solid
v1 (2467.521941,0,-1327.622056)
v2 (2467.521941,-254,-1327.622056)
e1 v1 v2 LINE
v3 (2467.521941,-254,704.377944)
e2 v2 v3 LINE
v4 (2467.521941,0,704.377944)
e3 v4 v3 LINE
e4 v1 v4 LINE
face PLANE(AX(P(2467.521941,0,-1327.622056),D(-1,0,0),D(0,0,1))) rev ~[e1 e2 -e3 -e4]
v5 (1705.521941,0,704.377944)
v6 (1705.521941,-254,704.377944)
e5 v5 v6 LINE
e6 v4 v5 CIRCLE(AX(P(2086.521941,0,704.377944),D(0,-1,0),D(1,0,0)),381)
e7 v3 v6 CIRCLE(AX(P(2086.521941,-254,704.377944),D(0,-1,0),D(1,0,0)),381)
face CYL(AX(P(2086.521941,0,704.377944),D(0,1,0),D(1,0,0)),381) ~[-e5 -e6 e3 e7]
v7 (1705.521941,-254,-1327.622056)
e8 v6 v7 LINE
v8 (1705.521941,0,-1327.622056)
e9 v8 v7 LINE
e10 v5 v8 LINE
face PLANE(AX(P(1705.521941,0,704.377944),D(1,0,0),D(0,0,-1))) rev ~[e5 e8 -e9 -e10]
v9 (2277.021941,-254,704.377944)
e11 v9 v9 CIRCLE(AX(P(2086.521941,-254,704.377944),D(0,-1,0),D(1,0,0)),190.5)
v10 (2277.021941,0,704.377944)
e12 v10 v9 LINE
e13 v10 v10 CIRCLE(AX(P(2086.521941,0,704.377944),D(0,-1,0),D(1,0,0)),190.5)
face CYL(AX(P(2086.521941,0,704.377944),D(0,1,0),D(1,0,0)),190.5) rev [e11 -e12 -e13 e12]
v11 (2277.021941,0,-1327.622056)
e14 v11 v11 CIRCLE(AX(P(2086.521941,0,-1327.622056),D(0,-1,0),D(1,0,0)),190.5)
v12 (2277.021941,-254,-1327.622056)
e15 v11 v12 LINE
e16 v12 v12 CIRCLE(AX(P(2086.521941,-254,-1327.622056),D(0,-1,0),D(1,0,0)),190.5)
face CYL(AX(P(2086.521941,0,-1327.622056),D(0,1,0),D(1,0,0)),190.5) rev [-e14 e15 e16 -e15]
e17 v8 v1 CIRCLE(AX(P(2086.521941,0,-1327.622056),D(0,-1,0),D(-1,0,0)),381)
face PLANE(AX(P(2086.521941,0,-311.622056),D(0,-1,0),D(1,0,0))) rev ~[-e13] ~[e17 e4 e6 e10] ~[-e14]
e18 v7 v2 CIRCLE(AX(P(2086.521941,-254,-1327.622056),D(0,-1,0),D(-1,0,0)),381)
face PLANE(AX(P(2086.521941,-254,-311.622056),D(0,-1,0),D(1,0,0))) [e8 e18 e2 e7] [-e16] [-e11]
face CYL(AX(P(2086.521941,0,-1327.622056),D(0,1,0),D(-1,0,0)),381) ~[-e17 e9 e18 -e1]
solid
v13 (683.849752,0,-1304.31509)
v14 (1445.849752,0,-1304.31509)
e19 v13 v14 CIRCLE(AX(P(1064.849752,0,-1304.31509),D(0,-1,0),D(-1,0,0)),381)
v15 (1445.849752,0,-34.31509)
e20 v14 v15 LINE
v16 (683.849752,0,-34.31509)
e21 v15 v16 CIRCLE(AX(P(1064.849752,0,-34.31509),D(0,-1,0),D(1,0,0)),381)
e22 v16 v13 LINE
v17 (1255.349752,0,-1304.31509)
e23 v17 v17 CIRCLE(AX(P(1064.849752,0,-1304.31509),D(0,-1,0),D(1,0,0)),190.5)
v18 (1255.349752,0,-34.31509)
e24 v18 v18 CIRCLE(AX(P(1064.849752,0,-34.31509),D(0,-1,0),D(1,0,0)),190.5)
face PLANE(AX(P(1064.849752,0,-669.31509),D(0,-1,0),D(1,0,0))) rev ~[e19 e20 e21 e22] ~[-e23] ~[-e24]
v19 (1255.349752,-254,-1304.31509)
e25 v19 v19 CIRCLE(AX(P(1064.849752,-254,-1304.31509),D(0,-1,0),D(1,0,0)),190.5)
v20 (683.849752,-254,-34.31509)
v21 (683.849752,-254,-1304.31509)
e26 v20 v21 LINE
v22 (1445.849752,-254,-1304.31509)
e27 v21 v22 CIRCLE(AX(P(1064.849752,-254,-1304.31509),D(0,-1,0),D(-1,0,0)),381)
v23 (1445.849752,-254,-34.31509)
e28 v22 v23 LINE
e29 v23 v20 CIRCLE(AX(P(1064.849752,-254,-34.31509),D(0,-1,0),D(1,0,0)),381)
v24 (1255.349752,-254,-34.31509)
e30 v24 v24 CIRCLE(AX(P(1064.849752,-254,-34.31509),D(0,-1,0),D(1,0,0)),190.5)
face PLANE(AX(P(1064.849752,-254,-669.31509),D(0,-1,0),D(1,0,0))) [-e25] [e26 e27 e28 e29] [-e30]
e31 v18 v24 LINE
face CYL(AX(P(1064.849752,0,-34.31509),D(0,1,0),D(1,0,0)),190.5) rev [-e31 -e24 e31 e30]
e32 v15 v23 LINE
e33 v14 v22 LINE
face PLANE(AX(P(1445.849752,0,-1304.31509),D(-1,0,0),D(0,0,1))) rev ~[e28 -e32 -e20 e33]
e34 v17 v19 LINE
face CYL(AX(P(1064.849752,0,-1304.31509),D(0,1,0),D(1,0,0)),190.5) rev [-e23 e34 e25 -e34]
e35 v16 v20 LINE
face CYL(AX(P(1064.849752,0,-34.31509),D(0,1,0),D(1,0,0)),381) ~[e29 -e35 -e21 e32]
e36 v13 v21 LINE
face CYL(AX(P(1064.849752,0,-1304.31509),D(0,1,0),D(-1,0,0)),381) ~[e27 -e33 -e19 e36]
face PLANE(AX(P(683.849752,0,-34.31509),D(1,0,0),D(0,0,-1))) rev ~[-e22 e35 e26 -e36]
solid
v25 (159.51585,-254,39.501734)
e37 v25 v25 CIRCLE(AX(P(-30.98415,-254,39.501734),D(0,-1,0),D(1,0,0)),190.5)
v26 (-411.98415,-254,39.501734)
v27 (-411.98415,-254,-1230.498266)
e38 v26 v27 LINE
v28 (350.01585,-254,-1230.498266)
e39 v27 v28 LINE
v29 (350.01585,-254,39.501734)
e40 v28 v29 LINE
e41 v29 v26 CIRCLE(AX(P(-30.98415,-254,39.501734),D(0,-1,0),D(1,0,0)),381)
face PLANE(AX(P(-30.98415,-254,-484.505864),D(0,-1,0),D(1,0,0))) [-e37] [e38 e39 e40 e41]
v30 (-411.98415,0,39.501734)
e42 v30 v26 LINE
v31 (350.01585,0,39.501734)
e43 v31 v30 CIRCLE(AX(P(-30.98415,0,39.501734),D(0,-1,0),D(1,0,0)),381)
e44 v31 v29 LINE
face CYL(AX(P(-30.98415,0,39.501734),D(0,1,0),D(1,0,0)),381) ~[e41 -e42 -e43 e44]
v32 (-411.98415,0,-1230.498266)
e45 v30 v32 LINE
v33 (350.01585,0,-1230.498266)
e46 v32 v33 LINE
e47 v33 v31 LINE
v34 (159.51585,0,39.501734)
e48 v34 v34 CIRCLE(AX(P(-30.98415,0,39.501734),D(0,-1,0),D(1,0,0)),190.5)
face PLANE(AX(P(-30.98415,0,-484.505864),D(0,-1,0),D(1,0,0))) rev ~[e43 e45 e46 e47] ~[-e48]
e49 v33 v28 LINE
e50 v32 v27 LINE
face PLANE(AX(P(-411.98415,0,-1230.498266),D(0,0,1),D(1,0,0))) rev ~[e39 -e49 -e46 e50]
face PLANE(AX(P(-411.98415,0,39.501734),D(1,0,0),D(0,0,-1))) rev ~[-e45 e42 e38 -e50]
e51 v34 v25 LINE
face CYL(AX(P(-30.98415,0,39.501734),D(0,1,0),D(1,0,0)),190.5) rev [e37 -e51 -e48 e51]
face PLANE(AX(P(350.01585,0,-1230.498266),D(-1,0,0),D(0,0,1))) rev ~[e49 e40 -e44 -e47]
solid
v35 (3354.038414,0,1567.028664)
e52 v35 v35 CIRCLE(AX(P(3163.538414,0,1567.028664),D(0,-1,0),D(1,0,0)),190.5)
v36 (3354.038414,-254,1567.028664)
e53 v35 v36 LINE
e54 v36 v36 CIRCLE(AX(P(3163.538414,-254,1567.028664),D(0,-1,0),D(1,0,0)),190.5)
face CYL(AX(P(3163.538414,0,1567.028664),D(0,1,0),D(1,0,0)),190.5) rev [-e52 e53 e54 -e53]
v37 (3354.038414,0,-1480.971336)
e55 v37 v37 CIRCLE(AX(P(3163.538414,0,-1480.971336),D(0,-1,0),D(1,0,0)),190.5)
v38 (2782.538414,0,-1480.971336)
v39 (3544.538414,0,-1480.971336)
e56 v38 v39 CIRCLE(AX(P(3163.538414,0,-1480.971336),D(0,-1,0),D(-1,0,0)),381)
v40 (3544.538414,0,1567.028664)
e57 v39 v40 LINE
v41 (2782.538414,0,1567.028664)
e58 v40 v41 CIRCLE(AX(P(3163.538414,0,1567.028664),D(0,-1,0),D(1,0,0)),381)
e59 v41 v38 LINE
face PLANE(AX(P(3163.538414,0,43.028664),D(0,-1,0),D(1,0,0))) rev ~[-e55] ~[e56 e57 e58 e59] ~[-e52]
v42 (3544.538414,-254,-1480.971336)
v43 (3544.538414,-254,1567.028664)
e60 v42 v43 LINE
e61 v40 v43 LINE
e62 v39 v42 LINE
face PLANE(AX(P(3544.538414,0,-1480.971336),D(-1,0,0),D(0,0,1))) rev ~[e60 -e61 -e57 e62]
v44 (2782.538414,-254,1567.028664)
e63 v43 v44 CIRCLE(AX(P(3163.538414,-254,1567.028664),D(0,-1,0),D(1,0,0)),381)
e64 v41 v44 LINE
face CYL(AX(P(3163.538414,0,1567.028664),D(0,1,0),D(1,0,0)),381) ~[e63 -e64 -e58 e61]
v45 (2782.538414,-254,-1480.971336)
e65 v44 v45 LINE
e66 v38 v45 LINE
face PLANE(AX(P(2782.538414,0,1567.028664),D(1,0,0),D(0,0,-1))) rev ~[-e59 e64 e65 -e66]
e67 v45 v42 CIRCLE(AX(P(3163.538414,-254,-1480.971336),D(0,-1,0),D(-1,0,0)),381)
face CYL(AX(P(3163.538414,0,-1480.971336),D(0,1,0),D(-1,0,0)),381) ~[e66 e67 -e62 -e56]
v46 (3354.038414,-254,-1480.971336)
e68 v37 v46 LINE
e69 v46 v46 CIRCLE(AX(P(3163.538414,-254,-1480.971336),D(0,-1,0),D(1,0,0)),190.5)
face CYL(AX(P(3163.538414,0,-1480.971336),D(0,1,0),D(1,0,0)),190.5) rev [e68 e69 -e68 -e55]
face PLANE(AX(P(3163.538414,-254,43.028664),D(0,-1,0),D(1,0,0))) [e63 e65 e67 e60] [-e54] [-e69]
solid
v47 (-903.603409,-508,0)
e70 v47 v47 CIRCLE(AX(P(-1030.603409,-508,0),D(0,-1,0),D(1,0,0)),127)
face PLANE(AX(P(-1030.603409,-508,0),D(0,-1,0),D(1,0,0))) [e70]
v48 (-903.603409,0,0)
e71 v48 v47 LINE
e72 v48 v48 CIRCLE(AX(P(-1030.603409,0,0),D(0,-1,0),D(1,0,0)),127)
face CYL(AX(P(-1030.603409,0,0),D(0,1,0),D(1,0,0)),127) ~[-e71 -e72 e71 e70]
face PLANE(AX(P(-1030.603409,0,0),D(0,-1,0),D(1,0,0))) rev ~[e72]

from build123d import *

# Parameters (mm, degrees)
F1_R      = 190.5
F2_DEPTH  = 254
F3_R      = 190.5
F4_DEPTH  = 254
F5_R      = 190.5
F6_DEPTH  = 254
F7_R      = 190.5
F8_DEPTH  = 254
F9_R      = 127
F10_DEPTH = 508


# Not quite as in the source:
# - a variable given as a bare number and used for a length is read in inches; the dataset says mm whatever the document's units were


with BuildPart() as f2:
    # F1 (on Front) → F2 (new body)
    with BuildSketch(Plane.XZ):
        with BuildLine():
            Line((350.0158497542, -1230.4982659221), (350.0158497542, 39.5017340779))
            ThreePointArc((350.0158497542, 39.5017340779), (-30.9841502458, 420.5017340779), (-411.9841502458, 39.5017340779))
            Line((-411.9841502458, 39.5017340779), (-411.9841502458, -1230.4982659221))
            Line((-411.9841502458, -1230.4982659221), (350.0158497542, -1230.4982659221))
        make_face()
        with Locations((-30.9841502458, 39.5017340779)):
            Circle(F1_R, mode=Mode.SUBTRACT)
    extrude(amount=F2_DEPTH)


with BuildPart() as f4:
    # F3 (on Front) → F4 (new body)
    with BuildSketch(Plane.XZ):
        with BuildLine():
            Line((1445.8497519493, -1304.3150901794), (1445.8497519493, -34.3150901794))
            ThreePointArc((1445.8497519493, -34.3150901794), (1064.8497519493, 346.6849098206), (683.8497519493, -34.3150901794))
            Line((683.8497519493, -34.3150901794), (683.8497519493, -1304.3150901794))
            ThreePointArc((683.8497519493, -1304.3150901794), (1064.8497519493, -1685.3150901794), (1445.8497519493, -1304.3150901794))
        make_face()
        with Locations((1064.8497519493, -1304.3150901794)):
            Circle(F3_R, mode=Mode.SUBTRACT)
        with Locations((1064.8497519493, -34.3150901794)):
            Circle(F3_R, mode=Mode.SUBTRACT)
    extrude(amount=F4_DEPTH)


with BuildPart() as f6:
    # F5 (on Front) → F6 (new body)
    with BuildSketch(Plane.XZ):
        with BuildLine():
            Line((2467.521941185, -1327.6220560074), (2467.521941185, 704.3779439926))
            ThreePointArc((2467.521941185, 704.3779439926), (2086.521941185, 1085.3779439926), (1705.521941185, 704.3779439926))
            Line((1705.521941185, 704.3779439926), (1705.521941185, -1327.6220560074))
            ThreePointArc((1705.521941185, -1327.6220560074), (2086.521941185, -1708.6220560074), (2467.521941185, -1327.6220560074))
        make_face()
        with Locations((2086.521941185, -1327.6220560074)):
            Circle(F5_R, mode=Mode.SUBTRACT)
        with Locations((2086.521941185, 704.3779439926)):
            Circle(F5_R, mode=Mode.SUBTRACT)
    extrude(amount=F6_DEPTH)


with BuildPart() as f8:
    # F7 (on Front) → F8 (new body)
    with BuildSketch(Plane.XZ):
        with BuildLine():
            Line((3544.5384140015, -1480.9713363647), (3544.5384140015, 1567.0286636353))
            ThreePointArc((3544.5384140015, 1567.0286636353), (3163.5384140015, 1948.0286636353), (2782.5384140015, 1567.0286636353))
            Line((2782.5384140015, 1567.0286636353), (2782.5384140015, -1480.9713363647))
            ThreePointArc((2782.5384140015, -1480.9713363647), (3163.5384140015, -1861.9713363647), (3544.5384140015, -1480.9713363647))
        make_face()
        with Locations((3163.5384140015, -1480.9713363647)):
            Circle(F7_R, mode=Mode.SUBTRACT)
        with Locations((3163.5384140015, 1567.0286636353)):
            Circle(F7_R, mode=Mode.SUBTRACT)
    extrude(amount=F8_DEPTH)


with BuildPart() as f10:
    # F9 (on Front) → F10 (new body)
    with BuildSketch(Plane.XZ):
        with Locations((-1030.6034088135, 0)):
            Circle(F9_R)
    extrude(amount=F10_DEPTH)


solid = Compound([f2.part, f4.part, f6.part, f8.part, f10.part])
